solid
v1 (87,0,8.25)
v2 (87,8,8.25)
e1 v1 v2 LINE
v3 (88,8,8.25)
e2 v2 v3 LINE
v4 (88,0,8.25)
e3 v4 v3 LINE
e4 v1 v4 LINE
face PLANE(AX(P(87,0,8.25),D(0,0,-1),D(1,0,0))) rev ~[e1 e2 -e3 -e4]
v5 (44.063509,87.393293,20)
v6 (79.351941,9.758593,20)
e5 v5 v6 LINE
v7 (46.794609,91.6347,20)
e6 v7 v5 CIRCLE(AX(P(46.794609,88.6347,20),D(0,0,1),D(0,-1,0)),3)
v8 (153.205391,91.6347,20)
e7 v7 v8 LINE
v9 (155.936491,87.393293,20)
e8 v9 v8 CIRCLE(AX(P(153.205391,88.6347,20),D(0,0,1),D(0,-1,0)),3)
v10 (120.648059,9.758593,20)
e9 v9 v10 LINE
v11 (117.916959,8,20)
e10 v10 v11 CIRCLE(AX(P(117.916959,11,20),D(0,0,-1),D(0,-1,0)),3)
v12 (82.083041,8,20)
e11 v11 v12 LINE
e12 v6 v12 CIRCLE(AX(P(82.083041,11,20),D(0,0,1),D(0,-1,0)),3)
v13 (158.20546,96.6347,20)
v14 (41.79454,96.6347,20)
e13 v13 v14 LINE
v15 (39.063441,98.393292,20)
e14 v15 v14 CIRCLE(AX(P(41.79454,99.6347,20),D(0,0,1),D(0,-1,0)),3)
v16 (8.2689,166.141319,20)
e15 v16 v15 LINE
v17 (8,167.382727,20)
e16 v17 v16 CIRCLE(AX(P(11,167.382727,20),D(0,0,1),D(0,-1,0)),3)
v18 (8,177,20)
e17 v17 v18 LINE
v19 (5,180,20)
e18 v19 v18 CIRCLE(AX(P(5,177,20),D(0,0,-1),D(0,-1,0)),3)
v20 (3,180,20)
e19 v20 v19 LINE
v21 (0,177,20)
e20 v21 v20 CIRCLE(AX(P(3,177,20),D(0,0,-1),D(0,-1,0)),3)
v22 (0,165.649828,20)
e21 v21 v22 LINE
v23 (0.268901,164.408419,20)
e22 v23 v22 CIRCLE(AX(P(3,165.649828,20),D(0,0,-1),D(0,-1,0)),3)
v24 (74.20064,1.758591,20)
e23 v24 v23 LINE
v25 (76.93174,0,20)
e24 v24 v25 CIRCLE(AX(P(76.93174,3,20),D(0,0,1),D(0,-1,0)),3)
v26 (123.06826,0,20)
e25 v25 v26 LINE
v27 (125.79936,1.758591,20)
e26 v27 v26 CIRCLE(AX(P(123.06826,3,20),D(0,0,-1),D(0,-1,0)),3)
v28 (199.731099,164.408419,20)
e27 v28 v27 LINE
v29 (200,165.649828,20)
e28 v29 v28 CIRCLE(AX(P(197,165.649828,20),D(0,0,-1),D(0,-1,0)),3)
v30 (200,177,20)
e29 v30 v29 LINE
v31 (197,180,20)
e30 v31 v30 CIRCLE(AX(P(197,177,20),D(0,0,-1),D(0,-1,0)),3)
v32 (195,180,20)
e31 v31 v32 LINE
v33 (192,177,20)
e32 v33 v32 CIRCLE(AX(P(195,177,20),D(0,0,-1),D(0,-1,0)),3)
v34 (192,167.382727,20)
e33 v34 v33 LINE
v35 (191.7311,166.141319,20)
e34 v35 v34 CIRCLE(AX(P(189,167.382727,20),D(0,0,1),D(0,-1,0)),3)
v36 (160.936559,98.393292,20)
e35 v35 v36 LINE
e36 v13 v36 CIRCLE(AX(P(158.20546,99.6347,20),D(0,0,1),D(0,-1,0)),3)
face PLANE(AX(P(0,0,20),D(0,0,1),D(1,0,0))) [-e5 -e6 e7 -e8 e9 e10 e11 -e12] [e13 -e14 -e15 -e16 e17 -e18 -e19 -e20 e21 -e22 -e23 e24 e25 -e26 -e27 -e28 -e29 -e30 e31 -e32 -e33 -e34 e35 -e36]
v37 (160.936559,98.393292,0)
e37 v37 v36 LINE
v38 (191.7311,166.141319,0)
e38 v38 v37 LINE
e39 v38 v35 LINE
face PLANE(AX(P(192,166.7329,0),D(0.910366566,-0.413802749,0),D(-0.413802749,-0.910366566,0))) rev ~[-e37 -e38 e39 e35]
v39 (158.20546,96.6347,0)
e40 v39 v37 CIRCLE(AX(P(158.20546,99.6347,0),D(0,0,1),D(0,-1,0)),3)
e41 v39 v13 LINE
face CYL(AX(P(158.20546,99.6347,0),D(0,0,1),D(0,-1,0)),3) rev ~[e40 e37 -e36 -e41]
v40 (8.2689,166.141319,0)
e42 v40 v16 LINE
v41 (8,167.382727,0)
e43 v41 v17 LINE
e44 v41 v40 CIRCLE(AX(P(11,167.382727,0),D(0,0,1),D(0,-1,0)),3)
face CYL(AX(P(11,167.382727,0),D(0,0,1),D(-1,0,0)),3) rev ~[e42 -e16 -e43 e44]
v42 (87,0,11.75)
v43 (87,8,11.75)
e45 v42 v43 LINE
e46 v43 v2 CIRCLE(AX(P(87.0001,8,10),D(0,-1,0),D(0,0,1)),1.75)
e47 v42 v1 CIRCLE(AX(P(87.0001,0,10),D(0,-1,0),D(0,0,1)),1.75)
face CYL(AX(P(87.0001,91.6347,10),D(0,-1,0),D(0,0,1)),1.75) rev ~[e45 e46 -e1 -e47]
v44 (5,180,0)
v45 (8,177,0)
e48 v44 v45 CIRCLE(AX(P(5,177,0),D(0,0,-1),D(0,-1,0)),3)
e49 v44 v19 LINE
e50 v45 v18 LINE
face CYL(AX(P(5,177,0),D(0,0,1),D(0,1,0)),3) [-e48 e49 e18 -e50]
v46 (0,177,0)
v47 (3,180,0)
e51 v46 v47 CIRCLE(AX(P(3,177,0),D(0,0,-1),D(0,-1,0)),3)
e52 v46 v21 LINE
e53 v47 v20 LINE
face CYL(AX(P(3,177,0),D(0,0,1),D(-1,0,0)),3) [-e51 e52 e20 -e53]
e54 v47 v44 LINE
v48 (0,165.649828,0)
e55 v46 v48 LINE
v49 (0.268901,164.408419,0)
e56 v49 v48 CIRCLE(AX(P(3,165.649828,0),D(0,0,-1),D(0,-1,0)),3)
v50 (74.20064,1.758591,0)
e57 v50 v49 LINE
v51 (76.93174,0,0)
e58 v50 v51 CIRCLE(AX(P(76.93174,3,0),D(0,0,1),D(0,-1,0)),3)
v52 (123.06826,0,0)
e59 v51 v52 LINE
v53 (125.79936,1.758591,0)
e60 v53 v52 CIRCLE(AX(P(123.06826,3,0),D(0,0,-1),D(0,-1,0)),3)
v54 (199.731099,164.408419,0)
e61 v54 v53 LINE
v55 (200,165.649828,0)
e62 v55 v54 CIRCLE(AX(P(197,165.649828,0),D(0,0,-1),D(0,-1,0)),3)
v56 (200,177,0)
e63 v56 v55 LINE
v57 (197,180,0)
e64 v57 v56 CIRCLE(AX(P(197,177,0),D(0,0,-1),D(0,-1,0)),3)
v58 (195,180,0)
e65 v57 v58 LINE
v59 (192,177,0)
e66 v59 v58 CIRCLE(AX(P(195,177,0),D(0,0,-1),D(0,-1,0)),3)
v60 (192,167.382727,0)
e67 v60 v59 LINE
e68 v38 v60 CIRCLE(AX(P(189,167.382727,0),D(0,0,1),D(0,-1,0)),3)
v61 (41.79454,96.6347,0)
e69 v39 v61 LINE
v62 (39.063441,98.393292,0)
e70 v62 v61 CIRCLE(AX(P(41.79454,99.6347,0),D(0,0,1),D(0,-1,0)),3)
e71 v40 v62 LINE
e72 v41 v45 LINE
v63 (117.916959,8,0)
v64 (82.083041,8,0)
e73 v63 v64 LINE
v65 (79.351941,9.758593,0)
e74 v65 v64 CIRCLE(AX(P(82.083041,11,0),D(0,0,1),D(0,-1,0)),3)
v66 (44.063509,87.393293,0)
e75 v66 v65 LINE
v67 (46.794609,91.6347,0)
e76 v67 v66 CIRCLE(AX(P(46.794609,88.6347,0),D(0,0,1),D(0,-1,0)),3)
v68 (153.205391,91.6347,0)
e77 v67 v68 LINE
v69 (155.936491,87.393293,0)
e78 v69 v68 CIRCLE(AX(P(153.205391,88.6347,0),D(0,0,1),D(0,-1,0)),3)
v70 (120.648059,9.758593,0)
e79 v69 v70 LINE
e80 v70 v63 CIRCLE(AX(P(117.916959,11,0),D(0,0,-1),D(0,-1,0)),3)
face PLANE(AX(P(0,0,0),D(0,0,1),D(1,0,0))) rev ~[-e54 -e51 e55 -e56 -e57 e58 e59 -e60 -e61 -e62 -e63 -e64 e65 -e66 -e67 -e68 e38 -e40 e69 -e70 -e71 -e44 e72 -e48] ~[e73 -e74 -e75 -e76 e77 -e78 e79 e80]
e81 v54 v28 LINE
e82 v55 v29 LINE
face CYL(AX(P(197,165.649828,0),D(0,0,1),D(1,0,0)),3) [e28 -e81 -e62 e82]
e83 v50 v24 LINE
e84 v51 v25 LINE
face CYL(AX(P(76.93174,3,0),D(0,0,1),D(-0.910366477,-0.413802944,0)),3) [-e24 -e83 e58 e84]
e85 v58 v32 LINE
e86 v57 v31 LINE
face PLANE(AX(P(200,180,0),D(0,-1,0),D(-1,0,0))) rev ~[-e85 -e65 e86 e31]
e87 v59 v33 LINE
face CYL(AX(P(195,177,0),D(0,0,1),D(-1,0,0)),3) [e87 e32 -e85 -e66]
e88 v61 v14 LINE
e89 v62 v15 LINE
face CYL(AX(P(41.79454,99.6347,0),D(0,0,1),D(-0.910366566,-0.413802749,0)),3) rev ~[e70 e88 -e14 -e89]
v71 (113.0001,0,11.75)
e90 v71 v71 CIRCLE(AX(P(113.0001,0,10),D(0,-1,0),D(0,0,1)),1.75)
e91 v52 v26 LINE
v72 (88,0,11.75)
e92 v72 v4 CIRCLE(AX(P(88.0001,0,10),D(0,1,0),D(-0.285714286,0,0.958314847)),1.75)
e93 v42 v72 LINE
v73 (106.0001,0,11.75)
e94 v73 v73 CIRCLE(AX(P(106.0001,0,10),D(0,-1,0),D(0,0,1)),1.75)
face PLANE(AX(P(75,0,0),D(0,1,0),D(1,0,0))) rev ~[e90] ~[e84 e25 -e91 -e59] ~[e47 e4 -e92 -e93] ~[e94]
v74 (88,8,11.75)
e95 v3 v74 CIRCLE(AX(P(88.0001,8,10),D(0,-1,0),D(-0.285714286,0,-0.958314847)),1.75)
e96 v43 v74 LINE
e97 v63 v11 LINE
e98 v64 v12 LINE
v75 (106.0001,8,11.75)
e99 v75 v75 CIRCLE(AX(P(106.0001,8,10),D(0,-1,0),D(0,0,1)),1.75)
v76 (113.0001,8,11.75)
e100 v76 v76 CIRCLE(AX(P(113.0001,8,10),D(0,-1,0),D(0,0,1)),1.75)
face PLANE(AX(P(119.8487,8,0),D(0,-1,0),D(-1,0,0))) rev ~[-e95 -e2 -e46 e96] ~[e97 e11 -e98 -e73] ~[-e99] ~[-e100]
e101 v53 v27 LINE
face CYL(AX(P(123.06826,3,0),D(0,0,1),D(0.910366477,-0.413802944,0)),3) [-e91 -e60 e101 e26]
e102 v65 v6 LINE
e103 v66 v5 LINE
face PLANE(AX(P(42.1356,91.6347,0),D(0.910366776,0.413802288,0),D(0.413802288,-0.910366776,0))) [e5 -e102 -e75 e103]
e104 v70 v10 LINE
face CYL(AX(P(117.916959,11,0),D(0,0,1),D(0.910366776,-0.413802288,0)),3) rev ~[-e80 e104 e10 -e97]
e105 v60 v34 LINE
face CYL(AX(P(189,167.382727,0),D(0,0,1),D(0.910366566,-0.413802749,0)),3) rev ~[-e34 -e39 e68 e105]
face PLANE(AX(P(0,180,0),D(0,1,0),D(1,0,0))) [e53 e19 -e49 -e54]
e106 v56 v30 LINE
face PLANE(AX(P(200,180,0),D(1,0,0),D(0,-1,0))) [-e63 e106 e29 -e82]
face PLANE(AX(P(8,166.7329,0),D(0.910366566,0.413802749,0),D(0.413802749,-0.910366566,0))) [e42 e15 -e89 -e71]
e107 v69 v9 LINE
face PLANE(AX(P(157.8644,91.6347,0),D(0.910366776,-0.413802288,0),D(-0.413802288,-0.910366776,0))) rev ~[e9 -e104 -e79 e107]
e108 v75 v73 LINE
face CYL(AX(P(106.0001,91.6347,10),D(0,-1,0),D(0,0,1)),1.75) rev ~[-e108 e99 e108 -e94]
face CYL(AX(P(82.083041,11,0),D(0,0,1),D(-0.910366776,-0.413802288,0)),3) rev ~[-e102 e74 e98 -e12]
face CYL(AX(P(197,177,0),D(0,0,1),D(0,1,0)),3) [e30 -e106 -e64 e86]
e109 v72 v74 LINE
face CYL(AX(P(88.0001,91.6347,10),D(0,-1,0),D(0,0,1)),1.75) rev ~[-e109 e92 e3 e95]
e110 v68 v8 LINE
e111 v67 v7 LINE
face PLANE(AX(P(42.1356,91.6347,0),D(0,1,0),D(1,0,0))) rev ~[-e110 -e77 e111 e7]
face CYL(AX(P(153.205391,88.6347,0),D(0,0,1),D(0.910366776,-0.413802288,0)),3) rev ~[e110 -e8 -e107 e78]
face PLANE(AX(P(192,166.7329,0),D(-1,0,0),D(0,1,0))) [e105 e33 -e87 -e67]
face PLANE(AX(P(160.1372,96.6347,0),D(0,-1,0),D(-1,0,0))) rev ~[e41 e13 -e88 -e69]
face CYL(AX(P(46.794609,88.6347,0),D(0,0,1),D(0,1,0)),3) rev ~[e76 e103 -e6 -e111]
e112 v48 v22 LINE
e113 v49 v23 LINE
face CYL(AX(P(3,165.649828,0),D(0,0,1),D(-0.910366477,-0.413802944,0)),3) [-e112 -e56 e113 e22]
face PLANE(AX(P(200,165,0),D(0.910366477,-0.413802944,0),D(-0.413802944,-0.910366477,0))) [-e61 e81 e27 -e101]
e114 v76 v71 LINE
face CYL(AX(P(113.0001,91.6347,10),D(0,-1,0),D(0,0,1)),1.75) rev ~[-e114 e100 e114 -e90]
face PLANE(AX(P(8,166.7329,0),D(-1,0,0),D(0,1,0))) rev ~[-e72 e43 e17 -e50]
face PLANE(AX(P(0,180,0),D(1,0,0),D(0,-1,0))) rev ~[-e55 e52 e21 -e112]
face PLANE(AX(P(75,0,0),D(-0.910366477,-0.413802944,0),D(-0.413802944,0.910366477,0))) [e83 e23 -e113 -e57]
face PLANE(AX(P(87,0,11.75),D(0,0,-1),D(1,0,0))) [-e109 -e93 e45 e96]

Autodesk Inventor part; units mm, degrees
ref_plane "YZ Plane" through (0, 0, 0) normal (1, 0, 0) x (0, 1, 0)
ref_plane "XZ Plane" through (0, 0, 0) normal (0, 1, 0) x (-1, 0, 0)
ref_plane "XY Plane" through (0, 0, 0) normal (0, 0, 1) x (1, 0, 0)
sketch "Sketch2" plane through (0, 0, 0) normal (0, 0, 1) x (1, 0, 0)
  line L0 (0, 0) -> (200, 0) construction
  line L1 (200, 0) -> (200, 180) construction
  line L2 (200, 180) -> (0, 180) construction
  line L3 (0, 180) -> (0, 0) construction
  line L4 (0, 0) -> (75, 0) construction
  line L5 (75, 0) -> (125, 0)
  line L6 (125, 0) -> (200, 0) construction
  line L7 (0, 180) -> (0, 165)
  line L8 (200, 180) -> (200, 165)
  line L9 (200, 165) -> (125, 0)
  line L10 (75, 0) -> (0, 165)
  line L11 (0, 180) -> (8, 180)
  line L12 (200, 180) -> (192, 180)
  line L13 (119.8487, 8) -> (80.1513, 8)
  line L14 (8, 166.7329) -> (39.8628, 96.6347)
  line L15 (192, 166.7329) -> (160.1372, 96.6347)
  line L16 (160.1372, 96.6347) -> (39.8628, 96.6347)
  line L17 (8, 166.7329) -> (8, 180)
  line L18 (192, 166.7329) -> (192, 180)
  line L19 (42.1356, 91.6347) -> (80.1513, 8)
  line L20 (157.8644, 91.6347) -> (119.8487, 8)
  line L21 (42.1356, 91.6347) -> (157.8644, 91.6347)
  dimension "d0" = 200
  dimension "d1" = 180
  dimension "d2" = 75
  dimension "d3" = 50
  dimension "d4" = 15
  dimension "d5" = 15
  dimension "d6" = 8
  dimension "d7" = 8
  dimension "d10" = 77
  dimension "d11" = 8
  dimension "d12" = 8
  dimension "d14" = 8
  dimension "d15" = 5
extrude "Extrusion1" add sketch "Sketch2" along normal blind 20
fillet "Fillet1" radius 3 16 edges at (8, 180, 10) (0, 180, 10) (8, 166.7329, 10) (0, 165, 10) (200, 180, 10) (192, 180, 10) (200, 165, 10) (192, 166.7329, 10) (39.8628, 96.6347, 10) (42.1356, 91.6347, 10) (160.1372, 96.6347, 10) (157.8644, 91.6347, 10) (80.1513, 8, 10) (119.8487, 8, 10) (125, 0, 10) (75, 0, 10)
sketch "Sketch5" plane through (46.7946, 91.6347, 20) normal (0, -1, 0) x (1, 0, 0)
  line L0 (106.4109, -20) -> (0, -20) projected
  line L1 (0, -20) -> (0, 0) projected
  point P0 (-46.7946, -20)
  point P1 (40.2055, -10)
  point P2 (41.2055, -10)
  point P3 (59.2055, -10)
  point P4 (66.2055, -10)
  dimension "d39" = 1
  dimension "d40" = 18
  dimension "d41" = 7
  dimension "d42" = 10
  dimension "d43" = 40.2055
hole "Hole1" at (87.0001, 91.6347, 10) at (88.0001, 91.6347, 10) at (106.0001, 91.6347, 10) at (113.0001, 91.6347, 10) direction (0, -1, 0) diameter 3.5 end through all
sketch "Sketch6" plane through (76.9317, 0, 0) normal (0, -1, 0) x (1, 0, 0)
  arc A0 (10.5683, 11.6771) -> (10.5683, 8.3229) centre (10.0683, 10) ccw projected
  line L0 (10.0683, 11.75) -> (11.0683, 11.75)
  line L1 (10.0683, 8.25) -> (11.0683, 8.25)
  arc A1 (10.5683, 8.3229) -> (10.5683, 11.6771) centre (11.0683, 10) ccw projected
  point P0 (-76.9317, 0)
extrude "Extrusion2" cut sketch "Sketch6" against normal blind 8 contours A0 L0 A1 | A0 A1 L1
properties part number "PatasColaTrasera"
